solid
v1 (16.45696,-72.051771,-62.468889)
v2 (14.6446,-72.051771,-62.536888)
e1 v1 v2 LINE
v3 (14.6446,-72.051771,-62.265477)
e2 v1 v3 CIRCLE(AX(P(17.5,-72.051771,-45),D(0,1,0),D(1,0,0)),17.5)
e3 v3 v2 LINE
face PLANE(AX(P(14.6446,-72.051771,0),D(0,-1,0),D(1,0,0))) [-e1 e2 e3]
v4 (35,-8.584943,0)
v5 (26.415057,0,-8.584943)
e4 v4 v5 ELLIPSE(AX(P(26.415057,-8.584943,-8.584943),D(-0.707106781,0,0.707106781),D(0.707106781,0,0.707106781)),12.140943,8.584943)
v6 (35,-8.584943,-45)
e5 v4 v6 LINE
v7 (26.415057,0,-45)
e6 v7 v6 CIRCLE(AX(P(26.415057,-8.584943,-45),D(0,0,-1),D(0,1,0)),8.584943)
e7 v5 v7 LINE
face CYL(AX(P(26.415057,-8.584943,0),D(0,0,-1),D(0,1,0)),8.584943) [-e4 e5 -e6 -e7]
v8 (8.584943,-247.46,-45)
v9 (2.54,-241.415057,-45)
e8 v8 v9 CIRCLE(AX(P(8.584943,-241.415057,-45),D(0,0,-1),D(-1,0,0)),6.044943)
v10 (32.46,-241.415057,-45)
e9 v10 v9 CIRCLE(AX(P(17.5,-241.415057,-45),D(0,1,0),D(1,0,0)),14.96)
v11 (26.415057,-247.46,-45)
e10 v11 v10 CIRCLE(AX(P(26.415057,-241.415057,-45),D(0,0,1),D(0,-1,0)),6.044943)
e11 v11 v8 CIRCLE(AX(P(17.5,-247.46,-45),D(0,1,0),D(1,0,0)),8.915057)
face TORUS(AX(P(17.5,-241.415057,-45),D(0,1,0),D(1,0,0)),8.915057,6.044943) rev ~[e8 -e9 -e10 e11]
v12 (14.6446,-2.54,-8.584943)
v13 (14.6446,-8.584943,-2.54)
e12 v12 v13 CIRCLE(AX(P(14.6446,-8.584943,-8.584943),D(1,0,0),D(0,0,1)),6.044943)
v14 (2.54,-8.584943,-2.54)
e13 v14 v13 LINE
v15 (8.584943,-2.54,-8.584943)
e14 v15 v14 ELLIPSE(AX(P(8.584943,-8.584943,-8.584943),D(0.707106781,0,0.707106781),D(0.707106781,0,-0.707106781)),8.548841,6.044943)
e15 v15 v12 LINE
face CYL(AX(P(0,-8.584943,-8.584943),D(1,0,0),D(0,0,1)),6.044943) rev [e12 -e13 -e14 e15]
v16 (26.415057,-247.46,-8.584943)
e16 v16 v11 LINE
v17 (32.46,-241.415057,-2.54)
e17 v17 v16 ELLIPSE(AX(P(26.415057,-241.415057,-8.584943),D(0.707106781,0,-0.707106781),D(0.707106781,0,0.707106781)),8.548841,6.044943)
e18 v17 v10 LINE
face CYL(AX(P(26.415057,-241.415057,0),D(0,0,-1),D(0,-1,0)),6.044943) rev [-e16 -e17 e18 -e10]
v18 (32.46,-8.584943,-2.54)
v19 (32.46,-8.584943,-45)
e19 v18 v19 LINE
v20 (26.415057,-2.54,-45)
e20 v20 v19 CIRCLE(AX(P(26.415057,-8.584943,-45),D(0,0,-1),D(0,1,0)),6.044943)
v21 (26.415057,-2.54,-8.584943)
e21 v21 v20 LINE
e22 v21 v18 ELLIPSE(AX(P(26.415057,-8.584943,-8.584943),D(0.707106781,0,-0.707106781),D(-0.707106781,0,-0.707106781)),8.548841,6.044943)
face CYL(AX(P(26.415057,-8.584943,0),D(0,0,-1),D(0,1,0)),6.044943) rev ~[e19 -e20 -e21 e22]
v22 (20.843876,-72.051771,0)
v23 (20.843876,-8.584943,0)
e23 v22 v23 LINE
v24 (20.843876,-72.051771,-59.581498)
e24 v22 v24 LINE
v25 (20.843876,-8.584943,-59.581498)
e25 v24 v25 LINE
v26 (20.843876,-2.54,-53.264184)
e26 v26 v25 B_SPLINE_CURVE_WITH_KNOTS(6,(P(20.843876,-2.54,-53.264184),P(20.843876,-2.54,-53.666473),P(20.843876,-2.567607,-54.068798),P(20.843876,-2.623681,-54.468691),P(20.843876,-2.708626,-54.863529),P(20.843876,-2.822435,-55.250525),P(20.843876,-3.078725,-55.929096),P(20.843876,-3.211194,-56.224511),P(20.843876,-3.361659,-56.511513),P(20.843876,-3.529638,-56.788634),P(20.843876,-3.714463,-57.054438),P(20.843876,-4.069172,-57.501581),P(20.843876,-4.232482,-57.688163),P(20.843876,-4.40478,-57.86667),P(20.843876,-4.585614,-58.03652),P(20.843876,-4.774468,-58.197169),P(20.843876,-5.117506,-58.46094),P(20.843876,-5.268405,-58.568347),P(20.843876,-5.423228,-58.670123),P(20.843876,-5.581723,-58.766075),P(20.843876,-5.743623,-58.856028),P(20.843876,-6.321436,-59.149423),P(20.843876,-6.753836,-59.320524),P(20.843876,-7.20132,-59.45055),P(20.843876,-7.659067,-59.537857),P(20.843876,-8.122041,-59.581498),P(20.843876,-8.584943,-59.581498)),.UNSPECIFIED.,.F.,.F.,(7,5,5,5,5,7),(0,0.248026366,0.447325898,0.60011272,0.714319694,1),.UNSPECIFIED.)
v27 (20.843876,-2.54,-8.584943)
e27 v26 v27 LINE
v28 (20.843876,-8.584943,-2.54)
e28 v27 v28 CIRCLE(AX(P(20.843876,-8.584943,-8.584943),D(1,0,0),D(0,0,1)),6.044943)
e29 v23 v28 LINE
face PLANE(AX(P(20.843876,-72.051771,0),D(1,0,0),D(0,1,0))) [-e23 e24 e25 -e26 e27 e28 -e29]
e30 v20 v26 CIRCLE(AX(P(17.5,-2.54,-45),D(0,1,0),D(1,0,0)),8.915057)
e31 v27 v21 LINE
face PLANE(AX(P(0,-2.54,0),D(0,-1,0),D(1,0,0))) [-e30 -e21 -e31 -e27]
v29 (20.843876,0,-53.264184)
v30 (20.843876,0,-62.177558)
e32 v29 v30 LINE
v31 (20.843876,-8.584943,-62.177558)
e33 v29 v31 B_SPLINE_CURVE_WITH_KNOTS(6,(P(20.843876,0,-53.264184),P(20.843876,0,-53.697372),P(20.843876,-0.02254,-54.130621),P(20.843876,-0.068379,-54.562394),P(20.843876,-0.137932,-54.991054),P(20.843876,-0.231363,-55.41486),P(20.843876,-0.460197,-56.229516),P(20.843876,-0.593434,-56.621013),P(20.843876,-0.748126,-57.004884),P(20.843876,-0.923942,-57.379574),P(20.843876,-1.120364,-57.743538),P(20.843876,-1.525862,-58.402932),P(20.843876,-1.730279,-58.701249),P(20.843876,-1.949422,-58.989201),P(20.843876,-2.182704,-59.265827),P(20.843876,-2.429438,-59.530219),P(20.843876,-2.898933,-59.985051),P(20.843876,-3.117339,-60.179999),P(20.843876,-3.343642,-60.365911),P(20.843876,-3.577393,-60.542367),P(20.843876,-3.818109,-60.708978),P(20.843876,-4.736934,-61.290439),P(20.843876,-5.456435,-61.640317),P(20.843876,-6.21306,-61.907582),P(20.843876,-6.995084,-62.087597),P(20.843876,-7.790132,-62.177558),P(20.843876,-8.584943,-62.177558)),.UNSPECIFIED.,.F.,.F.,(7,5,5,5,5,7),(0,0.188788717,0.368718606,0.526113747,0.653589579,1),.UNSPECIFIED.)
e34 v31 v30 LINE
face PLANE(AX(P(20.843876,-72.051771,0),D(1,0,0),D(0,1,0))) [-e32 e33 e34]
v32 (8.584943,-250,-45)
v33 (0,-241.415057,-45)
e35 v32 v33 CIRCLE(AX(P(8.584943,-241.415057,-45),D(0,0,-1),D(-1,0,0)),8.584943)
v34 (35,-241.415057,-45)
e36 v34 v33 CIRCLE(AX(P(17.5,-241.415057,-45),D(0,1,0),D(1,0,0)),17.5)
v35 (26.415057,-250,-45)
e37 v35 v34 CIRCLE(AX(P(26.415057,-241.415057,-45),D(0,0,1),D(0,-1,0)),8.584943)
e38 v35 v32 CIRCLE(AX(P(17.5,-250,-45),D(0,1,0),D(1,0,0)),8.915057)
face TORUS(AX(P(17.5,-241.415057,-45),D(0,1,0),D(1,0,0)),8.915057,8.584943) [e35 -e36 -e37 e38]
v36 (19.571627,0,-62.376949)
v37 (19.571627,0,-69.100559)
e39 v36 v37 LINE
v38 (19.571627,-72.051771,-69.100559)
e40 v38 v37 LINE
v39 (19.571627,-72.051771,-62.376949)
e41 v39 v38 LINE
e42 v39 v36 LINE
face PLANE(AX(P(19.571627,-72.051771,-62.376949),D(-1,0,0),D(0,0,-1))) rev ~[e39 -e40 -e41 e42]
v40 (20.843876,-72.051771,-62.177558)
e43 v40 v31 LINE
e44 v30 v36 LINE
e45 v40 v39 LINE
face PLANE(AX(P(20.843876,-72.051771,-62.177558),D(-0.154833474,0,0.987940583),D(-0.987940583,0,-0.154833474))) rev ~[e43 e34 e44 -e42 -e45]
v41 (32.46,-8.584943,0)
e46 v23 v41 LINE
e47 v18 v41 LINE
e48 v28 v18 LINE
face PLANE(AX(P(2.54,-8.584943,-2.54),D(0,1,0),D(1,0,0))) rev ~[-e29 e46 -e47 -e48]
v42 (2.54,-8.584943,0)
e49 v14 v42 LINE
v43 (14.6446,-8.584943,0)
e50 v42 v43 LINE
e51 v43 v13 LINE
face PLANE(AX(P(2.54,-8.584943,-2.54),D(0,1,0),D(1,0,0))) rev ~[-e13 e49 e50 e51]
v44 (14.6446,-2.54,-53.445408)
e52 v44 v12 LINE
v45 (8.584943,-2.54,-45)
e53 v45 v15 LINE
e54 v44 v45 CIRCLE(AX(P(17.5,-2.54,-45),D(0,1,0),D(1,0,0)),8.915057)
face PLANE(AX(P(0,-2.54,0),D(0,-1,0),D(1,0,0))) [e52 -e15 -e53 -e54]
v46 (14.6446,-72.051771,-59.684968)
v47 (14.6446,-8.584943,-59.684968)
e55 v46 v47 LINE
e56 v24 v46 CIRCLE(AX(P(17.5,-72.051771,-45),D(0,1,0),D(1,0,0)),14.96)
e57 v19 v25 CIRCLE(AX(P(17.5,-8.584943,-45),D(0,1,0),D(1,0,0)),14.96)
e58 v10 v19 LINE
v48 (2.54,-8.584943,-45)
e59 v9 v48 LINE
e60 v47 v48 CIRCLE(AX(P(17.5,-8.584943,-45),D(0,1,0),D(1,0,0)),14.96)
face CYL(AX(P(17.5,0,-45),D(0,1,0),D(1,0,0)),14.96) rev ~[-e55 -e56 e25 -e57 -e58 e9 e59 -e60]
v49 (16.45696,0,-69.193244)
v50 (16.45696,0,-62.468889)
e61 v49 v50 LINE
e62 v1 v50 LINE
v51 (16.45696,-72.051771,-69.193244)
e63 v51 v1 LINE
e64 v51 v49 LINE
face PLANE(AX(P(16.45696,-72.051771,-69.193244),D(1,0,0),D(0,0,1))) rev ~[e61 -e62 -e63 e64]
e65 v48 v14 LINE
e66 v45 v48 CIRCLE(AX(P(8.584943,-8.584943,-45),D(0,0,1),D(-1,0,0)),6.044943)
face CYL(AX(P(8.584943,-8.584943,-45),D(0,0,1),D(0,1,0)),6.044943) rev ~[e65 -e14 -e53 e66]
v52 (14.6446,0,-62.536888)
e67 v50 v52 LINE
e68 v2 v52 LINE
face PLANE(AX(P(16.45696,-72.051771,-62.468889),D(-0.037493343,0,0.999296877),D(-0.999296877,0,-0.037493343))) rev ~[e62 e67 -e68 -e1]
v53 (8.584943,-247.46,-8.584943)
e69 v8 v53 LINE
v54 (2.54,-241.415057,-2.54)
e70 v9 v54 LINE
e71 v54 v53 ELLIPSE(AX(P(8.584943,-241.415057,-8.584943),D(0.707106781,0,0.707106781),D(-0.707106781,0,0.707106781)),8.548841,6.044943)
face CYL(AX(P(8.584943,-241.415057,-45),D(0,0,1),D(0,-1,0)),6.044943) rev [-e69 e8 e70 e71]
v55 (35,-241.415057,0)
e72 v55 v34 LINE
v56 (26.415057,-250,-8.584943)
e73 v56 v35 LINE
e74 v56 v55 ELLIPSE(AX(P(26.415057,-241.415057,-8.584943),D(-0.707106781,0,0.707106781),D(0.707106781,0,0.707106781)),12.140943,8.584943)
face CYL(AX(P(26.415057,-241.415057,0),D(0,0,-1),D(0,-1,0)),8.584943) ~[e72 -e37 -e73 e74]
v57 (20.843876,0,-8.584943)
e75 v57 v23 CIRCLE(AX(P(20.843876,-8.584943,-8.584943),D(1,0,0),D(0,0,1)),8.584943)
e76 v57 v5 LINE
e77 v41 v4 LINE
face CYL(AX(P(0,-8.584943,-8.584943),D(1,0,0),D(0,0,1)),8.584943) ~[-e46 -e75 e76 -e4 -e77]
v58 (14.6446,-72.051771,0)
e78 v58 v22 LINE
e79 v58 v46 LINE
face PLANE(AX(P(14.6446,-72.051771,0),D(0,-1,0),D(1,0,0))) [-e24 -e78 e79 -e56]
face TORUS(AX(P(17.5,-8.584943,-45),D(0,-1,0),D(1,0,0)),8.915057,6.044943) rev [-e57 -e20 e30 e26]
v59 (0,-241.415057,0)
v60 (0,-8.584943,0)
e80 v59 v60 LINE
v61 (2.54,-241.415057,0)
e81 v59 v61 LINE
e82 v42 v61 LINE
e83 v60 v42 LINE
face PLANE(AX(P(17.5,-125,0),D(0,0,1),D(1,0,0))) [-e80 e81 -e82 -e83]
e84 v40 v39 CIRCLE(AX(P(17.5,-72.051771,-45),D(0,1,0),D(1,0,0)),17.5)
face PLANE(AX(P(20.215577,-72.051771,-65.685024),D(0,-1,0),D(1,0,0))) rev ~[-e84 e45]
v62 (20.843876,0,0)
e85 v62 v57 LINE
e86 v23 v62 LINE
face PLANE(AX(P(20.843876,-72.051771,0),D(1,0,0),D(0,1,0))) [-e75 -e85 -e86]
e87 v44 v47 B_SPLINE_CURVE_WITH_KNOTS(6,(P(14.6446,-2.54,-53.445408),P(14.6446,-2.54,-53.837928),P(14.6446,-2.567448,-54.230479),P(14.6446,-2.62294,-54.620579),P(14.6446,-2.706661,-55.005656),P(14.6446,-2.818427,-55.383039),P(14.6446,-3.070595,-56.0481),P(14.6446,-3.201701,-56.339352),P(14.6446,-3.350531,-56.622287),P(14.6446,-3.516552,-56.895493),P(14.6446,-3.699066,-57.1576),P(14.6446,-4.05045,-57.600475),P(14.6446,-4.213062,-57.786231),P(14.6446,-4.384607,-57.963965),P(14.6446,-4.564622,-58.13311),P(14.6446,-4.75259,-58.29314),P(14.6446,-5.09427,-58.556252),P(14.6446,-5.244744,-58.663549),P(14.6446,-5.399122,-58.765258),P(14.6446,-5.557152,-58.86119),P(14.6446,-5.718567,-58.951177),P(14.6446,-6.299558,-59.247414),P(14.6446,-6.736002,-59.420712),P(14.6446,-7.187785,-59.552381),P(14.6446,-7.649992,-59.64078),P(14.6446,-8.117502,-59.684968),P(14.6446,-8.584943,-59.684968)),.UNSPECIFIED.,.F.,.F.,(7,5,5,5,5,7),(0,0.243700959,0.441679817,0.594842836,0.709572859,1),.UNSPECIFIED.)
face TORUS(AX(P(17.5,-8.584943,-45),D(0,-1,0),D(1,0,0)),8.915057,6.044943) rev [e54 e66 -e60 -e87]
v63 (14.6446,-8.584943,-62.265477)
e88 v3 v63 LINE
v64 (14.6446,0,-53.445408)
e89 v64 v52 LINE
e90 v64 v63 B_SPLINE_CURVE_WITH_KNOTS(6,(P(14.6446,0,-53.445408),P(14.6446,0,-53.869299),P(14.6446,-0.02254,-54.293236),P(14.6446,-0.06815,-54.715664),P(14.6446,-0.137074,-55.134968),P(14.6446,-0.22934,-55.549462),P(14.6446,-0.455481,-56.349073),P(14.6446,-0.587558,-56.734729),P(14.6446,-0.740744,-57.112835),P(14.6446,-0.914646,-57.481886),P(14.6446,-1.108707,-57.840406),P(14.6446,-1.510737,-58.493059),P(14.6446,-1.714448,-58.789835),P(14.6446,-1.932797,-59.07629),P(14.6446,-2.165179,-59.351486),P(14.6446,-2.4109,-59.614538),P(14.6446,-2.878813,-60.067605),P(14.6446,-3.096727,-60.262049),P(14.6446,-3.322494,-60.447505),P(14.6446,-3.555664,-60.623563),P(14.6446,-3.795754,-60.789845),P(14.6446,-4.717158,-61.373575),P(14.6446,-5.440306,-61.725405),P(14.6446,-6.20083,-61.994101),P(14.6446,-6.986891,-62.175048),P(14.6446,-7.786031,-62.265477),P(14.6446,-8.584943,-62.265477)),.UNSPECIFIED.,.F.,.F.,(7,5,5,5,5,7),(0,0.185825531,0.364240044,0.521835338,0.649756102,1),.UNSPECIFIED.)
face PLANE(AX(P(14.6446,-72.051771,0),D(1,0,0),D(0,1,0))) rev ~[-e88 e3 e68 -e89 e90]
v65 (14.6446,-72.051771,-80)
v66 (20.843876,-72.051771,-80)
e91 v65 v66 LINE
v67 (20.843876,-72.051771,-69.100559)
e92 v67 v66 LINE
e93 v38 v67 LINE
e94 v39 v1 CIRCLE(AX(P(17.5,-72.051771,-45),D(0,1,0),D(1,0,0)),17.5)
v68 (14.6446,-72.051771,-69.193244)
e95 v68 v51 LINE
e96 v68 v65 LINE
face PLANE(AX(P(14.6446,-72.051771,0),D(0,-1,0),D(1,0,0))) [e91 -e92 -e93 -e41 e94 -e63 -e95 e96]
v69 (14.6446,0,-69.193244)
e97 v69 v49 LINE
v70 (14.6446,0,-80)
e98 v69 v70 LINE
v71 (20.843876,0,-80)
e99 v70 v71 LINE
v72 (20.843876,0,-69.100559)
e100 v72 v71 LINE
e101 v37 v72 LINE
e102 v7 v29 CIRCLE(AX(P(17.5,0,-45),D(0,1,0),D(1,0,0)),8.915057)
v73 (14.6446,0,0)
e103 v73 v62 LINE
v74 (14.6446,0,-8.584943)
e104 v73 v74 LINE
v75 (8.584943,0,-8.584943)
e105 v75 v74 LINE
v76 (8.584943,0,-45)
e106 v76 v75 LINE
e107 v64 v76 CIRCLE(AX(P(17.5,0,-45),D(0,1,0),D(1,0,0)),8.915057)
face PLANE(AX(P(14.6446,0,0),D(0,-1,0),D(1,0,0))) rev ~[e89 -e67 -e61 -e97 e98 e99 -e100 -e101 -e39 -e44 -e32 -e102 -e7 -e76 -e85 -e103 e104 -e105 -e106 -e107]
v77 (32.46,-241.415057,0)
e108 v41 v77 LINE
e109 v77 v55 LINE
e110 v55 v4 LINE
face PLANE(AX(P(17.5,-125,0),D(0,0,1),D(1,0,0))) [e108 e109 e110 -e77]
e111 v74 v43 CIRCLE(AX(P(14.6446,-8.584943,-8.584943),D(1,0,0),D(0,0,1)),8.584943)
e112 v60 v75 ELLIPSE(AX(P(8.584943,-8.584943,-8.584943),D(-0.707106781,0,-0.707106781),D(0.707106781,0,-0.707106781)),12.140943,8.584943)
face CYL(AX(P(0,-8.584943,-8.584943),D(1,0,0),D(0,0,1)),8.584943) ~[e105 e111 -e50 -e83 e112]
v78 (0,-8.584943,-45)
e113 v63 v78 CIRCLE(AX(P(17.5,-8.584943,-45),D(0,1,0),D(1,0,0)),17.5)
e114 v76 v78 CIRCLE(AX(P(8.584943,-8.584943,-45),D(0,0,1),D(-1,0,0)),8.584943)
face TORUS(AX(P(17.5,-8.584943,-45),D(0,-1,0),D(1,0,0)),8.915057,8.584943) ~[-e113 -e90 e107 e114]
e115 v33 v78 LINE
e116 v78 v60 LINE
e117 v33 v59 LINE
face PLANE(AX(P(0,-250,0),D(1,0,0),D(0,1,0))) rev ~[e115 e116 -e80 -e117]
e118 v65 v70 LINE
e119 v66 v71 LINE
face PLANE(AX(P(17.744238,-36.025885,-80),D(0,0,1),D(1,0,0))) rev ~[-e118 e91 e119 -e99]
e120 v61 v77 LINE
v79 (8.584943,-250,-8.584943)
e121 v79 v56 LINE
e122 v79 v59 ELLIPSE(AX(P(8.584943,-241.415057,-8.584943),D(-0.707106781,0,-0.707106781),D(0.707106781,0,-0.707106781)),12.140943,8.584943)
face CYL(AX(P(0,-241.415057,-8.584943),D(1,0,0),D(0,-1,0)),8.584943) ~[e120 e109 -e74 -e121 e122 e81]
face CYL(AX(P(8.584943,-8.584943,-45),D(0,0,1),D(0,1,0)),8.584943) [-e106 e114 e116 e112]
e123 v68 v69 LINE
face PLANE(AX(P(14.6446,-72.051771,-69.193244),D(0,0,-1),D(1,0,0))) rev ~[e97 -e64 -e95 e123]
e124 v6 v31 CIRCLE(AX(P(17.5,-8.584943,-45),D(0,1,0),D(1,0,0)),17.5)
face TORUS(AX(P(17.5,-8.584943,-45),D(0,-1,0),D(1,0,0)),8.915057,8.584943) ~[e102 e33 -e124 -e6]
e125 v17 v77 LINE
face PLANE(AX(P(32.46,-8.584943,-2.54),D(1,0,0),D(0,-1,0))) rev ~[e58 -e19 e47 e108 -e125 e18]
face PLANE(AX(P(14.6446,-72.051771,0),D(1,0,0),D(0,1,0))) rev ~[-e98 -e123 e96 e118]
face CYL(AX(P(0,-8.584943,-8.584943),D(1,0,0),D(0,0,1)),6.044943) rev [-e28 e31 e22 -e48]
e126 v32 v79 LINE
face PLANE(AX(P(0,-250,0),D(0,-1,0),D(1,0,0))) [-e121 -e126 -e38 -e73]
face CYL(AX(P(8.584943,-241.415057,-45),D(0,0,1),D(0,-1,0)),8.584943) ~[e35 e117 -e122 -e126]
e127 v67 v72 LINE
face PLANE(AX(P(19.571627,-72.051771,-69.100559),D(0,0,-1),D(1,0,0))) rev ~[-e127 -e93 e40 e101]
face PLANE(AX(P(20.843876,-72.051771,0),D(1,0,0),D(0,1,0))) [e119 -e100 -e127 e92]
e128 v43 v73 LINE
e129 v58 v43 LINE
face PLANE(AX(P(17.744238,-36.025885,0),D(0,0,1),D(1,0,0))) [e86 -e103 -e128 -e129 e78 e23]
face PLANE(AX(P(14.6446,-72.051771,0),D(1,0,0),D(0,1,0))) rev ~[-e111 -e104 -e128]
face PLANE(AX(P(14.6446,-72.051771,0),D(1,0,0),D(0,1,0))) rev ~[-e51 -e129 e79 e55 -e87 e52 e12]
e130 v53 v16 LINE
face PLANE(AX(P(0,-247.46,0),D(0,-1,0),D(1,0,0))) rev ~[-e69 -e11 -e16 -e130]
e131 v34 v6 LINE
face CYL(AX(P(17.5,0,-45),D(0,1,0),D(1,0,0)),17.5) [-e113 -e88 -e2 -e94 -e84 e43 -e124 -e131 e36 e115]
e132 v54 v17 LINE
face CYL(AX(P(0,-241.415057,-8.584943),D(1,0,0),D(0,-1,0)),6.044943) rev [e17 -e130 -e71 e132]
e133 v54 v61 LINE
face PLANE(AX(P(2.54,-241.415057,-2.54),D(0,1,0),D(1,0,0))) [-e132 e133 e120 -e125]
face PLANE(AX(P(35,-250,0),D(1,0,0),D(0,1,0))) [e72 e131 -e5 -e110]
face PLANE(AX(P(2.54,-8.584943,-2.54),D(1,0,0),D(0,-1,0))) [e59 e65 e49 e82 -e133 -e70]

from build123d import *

# Parameters (mm, degrees)
F0_W      = 35
F0_H      = 250
F1_DEPTH  = 45
F3_DEPTH  = 250
F4_DEPTH  = 250
F5_R      = 8.5849434278
F6_T      = -2.54
F7_W      = 6.1992760748
F7_H      = 72.0517709851
F8_DEPTH  = 80
F10_DEPTH = 101.346


# Not quite as in the source:
# - a shell that OpenCascade refuses in one call is made with other operations: the cavity is built on its own and cut out
# - a feature names something its author has since deleted; it is built from what else it names


with BuildPart() as f1:
    # F0 (on Top) → F1 (new body)
    with BuildSketch(Plane.XY):
        with Locations((17.5, -125)):
            Rectangle(F0_W, F0_H)
    extrude(amount=-F1_DEPTH)

    # F2 (on face) → F3 (join)
    with BuildSketch(Plane(origin=(0, 0, 0), x_dir=(-1, 0, 0), z_dir=(0, 1, 0))):
        with BuildLine():
            Line((-17.5, -45), (0, -45))
            ThreePointArc((0, -45), (-5.1256313292, -32.6256313292), (-17.5, -27.5))
            ThreePointArc((-17.5, -27.5), (-29.8743686708, -32.6256313292), (-35, -45))
            Line((-35, -45), (-17.5, -45))
        make_face()
        with BuildLine():
            ThreePointArc((-35, -45), (-17.5, -62.5), (0, -45))
            Line((0, -45), (-17.5, -45))
            Line((-17.5, -45), (-35, -45))
        make_face()
        with BuildLine():
            ThreePointArc((-17.5, -27.5), (-5.1256313292, -32.6256313292), (0, -45))
            Line((0, -45), (0, -27.5))
            Line((0, -27.5), (-17.5, -27.5))
        make_face()
    extrude(amount=-F3_DEPTH)

    # F2 (on face) → F4 (join)
    with BuildSketch(Plane(origin=(0, 0, 0), x_dir=(-1, 0, 0), z_dir=(0, 1, 0))):
        with BuildLine():
            Line((-17.5, -45), (0, -45))
            ThreePointArc((0, -45), (-5.1256313292, -32.6256313292), (-17.5, -27.5))
            ThreePointArc((-17.5, -27.5), (-29.8743686708, -32.6256313292), (-35, -45))
            Line((-35, -45), (-17.5, -45))
        make_face()
        with BuildLine():
            ThreePointArc((-35, -45), (-17.5, -62.5), (0, -45))
            Line((0, -45), (-17.5, -45))
            Line((-17.5, -45), (-35, -45))
        make_face()
        with BuildLine():
            ThreePointArc((-17.5, -27.5), (-5.1256313292, -32.6256313292), (0, -45))
            Line((0, -45), (0, -27.5))
            Line((0, -27.5), (-17.5, -27.5))
        make_face()
    extrude(amount=-F4_DEPTH)

    # F5
    f5_edges = [f1.edges().sort_by_distance(p)[0] for p in [
        (17.5, 0, 0),
        (35, 0, -22.5),
        (17.5, 0, -62.5),
        (0, 0, -22.5),
        (17.5, -250, 0),
        (0, -250, -22.5),
        (17.5, -250, -62.5),
        (35, -250, -22.5),
    ]]
    fillet(f5_edges, radius=F5_R)

    # F6: a shell. OpenCascade refuses it in one call, so the cavity is built on its own and cut out:
    # the body offset inwards by the wall thickness, plus a prism from it out through each open face.
    f6_core = offset(f1.part, amount=F6_T, mode=Mode.PRIVATE)
    f6_exits = [f6_core.faces().sort_by_distance(p)[0] for p in [
        (17.5, -125, -2.54),
    ]]
    add(f6_core, mode=Mode.SUBTRACT)
    extrude(f6_exits, amount=-F6_T, mode=Mode.SUBTRACT)

    # F7 (on Top) → F8 (join)
    with BuildSketch(Plane.XY):
        with Locations((17.7442375571, -36.0258854926)):
            Rectangle(F7_W, F7_H)
    extrude(amount=-F8_DEPTH)

    # F9 (on face) → F10 (cut)
    with BuildSketch(Plane.XZ.offset(72.0517709851)):
        Polygon((16.4569599832, -69.1932439804), (16.4569599832, -62.46888856), (14.6445995197, -62.5368878245), (14.6445995197, -69.1932439804), align=None)
        Polygon((20.8438755944, -62.1775579175), (19.5716265936, -62.376949193), (19.5716265936, -69.1005588385), (20.8438755944, -69.1005588385), align=None)
    extrude(amount=-F10_DEPTH, mode=Mode.SUBTRACT)


solid = f1.part
